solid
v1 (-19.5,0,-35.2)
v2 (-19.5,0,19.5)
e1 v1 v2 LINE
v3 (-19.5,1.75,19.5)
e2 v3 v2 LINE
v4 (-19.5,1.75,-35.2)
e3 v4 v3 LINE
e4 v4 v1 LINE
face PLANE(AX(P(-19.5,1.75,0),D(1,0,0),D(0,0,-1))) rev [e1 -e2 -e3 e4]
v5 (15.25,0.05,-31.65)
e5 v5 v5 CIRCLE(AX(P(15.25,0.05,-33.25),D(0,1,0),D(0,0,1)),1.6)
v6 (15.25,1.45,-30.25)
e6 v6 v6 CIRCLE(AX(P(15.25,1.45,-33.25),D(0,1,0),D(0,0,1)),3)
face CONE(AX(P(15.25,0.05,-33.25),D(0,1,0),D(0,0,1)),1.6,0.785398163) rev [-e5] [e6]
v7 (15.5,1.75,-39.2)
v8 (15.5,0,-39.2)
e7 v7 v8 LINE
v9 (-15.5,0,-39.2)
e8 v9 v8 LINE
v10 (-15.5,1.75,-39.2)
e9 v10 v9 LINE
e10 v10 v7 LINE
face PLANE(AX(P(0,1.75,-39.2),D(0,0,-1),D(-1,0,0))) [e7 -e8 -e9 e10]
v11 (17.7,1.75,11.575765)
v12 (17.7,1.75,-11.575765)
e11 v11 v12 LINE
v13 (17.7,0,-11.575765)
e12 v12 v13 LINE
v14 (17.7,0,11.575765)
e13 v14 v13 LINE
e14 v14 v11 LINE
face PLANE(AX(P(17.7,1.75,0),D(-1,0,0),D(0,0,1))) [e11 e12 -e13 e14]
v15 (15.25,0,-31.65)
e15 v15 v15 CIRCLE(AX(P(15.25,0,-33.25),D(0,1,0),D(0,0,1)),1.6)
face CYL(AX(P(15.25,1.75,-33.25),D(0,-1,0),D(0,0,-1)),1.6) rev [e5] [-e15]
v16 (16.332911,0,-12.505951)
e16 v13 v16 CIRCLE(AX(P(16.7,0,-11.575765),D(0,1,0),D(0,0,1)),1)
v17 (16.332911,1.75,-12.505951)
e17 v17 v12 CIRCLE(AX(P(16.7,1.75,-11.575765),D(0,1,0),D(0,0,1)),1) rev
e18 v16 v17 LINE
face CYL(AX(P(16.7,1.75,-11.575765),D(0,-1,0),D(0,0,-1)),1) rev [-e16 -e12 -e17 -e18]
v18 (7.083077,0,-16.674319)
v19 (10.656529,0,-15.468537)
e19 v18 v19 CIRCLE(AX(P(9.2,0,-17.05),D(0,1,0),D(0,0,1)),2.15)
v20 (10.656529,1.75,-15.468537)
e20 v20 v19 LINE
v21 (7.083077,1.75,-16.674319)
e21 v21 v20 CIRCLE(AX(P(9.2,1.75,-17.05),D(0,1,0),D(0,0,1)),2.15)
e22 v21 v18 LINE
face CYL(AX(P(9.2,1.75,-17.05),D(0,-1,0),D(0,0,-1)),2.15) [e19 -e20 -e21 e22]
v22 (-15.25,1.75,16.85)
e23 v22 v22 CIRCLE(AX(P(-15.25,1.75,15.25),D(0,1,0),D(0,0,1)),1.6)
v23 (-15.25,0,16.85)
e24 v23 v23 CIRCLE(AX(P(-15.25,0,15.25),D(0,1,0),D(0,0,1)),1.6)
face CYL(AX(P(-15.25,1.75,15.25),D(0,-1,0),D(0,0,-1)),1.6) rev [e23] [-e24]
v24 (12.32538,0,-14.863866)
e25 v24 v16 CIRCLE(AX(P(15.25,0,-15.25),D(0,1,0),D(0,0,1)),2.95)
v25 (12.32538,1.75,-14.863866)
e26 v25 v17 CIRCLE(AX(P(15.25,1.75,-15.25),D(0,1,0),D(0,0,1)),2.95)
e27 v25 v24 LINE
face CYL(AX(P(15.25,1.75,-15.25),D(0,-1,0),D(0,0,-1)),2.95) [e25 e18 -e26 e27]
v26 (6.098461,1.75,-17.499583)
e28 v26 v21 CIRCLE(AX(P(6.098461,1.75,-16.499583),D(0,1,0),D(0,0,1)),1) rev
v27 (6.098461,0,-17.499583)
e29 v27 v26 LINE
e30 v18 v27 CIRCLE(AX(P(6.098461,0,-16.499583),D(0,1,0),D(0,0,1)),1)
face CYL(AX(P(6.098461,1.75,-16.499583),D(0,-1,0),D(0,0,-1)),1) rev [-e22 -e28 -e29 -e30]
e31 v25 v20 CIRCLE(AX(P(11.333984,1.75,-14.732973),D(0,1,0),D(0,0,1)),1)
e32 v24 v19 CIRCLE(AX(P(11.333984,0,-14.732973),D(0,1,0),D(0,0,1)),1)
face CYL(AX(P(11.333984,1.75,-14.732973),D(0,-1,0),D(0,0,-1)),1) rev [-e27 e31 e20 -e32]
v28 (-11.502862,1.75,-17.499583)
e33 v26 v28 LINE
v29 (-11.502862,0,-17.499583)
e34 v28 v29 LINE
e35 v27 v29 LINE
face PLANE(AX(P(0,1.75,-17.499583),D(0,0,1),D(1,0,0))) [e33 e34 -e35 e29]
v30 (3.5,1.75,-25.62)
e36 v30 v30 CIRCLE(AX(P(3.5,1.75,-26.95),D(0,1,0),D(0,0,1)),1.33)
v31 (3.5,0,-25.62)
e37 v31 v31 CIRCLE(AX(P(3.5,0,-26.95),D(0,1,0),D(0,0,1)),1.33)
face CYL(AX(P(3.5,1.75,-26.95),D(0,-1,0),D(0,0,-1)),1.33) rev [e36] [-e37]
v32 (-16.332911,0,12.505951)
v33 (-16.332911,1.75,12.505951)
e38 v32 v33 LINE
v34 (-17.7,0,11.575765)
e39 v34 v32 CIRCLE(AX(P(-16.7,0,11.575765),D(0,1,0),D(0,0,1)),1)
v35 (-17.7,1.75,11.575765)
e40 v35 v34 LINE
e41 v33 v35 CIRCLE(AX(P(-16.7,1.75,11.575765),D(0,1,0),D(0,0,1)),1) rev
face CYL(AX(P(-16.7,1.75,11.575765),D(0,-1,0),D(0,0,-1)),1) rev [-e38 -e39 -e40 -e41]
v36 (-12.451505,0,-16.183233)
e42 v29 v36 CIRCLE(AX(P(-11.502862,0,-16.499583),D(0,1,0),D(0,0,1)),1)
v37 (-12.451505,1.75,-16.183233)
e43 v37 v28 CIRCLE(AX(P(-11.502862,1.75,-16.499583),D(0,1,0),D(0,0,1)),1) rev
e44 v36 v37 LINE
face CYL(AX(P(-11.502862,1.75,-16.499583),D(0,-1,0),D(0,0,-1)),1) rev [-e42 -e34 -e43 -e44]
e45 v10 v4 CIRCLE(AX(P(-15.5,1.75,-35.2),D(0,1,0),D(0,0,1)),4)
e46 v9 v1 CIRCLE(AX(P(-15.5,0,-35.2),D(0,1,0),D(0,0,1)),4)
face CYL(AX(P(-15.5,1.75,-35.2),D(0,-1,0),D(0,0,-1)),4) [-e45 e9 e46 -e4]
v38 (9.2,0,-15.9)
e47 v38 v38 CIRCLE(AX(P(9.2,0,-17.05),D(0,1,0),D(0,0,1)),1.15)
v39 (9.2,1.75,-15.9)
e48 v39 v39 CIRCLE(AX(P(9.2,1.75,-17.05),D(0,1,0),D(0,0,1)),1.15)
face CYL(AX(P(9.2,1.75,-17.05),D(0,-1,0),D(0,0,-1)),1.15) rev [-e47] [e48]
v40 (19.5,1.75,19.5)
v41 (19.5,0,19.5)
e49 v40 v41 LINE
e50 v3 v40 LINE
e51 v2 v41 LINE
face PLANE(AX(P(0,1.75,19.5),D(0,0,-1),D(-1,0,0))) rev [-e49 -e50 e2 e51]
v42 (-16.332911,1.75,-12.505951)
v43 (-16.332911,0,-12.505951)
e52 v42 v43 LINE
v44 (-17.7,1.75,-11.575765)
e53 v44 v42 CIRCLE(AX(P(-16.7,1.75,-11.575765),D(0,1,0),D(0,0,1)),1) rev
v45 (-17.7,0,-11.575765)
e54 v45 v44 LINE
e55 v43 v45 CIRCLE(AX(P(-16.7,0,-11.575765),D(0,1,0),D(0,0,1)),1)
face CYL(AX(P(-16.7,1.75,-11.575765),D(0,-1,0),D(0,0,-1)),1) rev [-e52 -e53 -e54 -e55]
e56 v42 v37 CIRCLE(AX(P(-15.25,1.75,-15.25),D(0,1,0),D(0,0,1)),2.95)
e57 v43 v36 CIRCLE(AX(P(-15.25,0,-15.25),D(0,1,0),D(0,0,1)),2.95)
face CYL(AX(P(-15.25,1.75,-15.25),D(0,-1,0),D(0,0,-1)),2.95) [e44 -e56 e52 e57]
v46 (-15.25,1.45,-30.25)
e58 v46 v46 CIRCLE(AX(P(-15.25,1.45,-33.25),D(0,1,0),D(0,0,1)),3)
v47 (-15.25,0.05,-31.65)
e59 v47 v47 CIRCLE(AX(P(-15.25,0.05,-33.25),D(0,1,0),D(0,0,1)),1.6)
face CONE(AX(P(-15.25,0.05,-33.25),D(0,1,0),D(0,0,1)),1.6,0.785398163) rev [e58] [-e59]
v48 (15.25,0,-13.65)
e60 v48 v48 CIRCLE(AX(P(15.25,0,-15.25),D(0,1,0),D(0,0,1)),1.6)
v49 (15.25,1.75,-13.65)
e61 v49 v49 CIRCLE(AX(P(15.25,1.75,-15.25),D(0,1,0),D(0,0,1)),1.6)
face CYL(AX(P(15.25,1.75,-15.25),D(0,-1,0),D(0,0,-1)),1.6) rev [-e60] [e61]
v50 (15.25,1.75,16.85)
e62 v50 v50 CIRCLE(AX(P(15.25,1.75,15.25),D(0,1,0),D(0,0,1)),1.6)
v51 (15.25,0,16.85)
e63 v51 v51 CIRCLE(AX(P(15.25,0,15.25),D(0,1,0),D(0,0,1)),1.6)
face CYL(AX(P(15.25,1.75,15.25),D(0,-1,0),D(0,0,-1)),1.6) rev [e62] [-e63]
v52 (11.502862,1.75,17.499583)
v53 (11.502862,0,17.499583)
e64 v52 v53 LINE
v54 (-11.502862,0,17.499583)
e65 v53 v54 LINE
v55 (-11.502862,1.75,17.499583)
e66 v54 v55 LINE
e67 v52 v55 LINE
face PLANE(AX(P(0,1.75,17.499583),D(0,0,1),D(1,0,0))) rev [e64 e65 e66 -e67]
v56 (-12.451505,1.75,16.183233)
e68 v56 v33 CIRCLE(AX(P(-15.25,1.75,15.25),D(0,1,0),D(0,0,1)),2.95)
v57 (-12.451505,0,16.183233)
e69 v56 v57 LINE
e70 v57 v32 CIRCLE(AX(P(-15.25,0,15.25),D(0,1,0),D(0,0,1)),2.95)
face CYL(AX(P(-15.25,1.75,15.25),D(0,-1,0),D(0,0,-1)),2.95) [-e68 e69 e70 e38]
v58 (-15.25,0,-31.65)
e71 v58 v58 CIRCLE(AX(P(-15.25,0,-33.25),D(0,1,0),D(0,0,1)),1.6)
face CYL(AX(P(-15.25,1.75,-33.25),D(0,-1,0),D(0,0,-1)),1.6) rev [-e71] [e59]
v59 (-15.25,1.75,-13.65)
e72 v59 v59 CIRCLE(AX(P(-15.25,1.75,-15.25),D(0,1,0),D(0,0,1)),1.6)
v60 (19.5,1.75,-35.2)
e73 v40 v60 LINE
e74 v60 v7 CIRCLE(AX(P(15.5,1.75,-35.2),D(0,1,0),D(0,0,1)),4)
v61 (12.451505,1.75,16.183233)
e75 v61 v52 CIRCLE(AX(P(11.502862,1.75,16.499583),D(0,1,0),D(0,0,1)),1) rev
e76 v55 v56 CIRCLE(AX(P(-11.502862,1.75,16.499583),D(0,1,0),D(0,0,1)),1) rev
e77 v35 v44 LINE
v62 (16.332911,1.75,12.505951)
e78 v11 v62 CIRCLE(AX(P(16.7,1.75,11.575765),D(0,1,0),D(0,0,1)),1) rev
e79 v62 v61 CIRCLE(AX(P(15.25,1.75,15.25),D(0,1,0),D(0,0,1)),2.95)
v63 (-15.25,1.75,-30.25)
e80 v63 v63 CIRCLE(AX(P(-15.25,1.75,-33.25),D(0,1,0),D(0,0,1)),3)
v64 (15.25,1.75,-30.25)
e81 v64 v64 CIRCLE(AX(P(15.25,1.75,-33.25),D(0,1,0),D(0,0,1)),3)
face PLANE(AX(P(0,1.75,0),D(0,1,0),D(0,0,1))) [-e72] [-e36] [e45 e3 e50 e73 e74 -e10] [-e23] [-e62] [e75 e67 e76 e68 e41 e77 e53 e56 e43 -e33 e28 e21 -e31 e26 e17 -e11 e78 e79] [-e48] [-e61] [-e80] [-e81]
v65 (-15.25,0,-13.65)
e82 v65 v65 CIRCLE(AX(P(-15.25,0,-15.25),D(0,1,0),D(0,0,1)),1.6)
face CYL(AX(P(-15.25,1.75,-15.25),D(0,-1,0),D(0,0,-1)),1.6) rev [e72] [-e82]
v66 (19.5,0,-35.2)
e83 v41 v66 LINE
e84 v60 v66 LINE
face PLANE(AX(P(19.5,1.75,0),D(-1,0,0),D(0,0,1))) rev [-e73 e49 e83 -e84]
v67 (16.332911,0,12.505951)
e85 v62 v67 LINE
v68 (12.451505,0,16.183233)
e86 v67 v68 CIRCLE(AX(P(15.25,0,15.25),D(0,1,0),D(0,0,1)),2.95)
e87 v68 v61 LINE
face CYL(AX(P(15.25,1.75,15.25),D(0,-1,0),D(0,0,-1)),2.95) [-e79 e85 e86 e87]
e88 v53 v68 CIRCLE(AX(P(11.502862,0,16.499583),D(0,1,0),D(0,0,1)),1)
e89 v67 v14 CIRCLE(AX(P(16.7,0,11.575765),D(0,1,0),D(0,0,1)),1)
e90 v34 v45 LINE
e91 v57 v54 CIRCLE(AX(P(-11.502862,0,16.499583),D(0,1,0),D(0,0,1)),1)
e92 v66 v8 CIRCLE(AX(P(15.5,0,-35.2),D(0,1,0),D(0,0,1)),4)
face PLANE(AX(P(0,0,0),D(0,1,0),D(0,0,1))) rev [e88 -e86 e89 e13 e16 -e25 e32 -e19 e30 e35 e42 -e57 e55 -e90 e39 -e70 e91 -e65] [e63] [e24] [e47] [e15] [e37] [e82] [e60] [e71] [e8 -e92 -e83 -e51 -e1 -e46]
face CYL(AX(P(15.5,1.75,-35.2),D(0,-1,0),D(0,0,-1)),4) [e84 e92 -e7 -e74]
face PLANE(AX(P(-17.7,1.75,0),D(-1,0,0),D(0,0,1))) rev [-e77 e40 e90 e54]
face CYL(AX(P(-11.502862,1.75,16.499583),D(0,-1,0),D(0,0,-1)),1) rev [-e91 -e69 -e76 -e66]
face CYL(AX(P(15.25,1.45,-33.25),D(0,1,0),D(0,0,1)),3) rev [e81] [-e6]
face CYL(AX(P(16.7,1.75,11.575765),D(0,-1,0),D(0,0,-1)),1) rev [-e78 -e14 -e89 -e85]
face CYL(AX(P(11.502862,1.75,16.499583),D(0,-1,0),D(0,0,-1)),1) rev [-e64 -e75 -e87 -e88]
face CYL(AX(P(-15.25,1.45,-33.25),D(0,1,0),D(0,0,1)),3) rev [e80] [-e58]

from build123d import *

# Parameters (mm, degrees)
SKETCH1_R               = 1.6
SKETCH1_R_2             = 1.15
SKETCH1_R_3             = 1.33
BASE_SHAPE_DEPTH        = 1.75
MILLING_FILLETS_R       = 1
SKETCH3_R               = 3
SCREW_HEAD_CUT_DEPTH    = 0.3
SCREW_HEAD_CHAMFER_SIZE = 1.4


with BuildPart() as part:
    # Sketch1 → Base shape (new body)
    with BuildSketch(Plane(origin=(0, 0, 0), x_dir=(1, 0, 0), z_dir=(0, 1, 0))):
        with BuildLine():
            Line((15.5, 39.2), (-15.5, 39.2))
            ThreePointArc((-15.5, 39.2), (-18.328427125, 38.028427125), (-19.5, 35.2))
            Line((-19.5, 35.2), (-19.5, -19.5))
            Line((-19.5, -19.5), (19.5, -19.5))
            Line((19.5, -19.5), (19.5, 35.2))
            ThreePointArc((19.5, 35.2), (18.328427125, 38.028427125), (15.5, 39.2))
        make_face()
        with Locations(Location((-15.25, -15.25, 0), (0, 0, 270))):
            Circle(SKETCH1_R, mode=Mode.SUBTRACT)
        with Locations(Location((15.25, -15.25, 0), (0, 0, 270))):
            Circle(SKETCH1_R, mode=Mode.SUBTRACT)
        with BuildLine():
            ThreePointArc((-17.7, 13.606832327), (-13.284874461, 13.049822367), (-13.341630288, 17.499583304))
            Line((-13.341630288, 17.499583304), (7.05, 17.499583304))
            Line((7.05, 17.499583304), (7.05, 17.05))
            ThreePointArc((7.05, 17.05), (8.336587223, 15.08098543), (10.656528722, 15.46853736))
            ThreePointArc((10.656528722, 15.46853736), (11.674639953, 15.673161101), (12.325380263, 14.863866097))
            ThreePointArc((12.325380263, 14.863866097), (14.578174541, 12.377518398), (17.7, 13.606832327))
            Line((17.7, 13.606832327), (17.7, -13.606832327))
            ThreePointArc((17.7, -13.606832327), (13.284874461, -13.049822367), (13.341630288, -17.499583304))
            Line((13.341630288, -17.499583304), (-13.341630288, -17.499583304))
            ThreePointArc((-13.341630288, -17.499583304), (-13.284874461, -13.049822367), (-17.7, -13.606832327))
            Line((-17.7, -13.606832327), (-17.7, 13.606832327))
        make_face(mode=Mode.SUBTRACT)
        with Locations(Location((-15.25, 15.25, 0), (0, 0, 270))):
            Circle(SKETCH1_R, mode=Mode.SUBTRACT)
        with Locations(Location((-15.25, 33.25, 0), (0, 0, 270))):
            Circle(SKETCH1_R, mode=Mode.SUBTRACT)
        with Locations(Location((9.2, 17.05, 0), (0, 0, 270))):
            Circle(SKETCH1_R_2, mode=Mode.SUBTRACT)
        with Locations(Location((15.25, 15.25, 0), (0, 0, 270))):
            Circle(SKETCH1_R, mode=Mode.SUBTRACT)
        with Locations(Location((3.5, 26.95, 0), (0, 0, 270))):
            Circle(SKETCH1_R_3, mode=Mode.SUBTRACT)
        with Locations(Location((15.25, 33.25, 0), (0, 0, 270))):
            Circle(SKETCH1_R, mode=Mode.SUBTRACT)
    extrude(amount=BASE_SHAPE_DEPTH)

    # Milling fillets
    milling_fillets_edges = [part.edges().sort_by_distance(p)[0] for p in [
        (-17.7, 0.875, 13.606832327),
        (-13.341630288, 0.875, 17.499583304),
        (13.341630288, 0.875, 17.499583304),
        (17.7, 0.875, 13.606832327),
        (17.7, 0.875, -13.606832327),
        (-13.341630288, 0.875, -17.499583304),
        (-17.7, 0.875, -13.606832327),
        (7.05, 0.875, -17.499583304),
    ]]
    fillet(milling_fillets_edges, radius=MILLING_FILLETS_R)

    # Sketch3 → Screw head cut (cut)
    with BuildSketch(Plane(origin=(0, 1.75, 0), x_dir=(1, 0, 0), z_dir=(0, 1, 0))):
        with Locations(Location((-15.25, 33.25, 0), (0, 0, 270))):
            Circle(SKETCH3_R)
        with Locations(Location((15.25, 33.25, 0), (0, 0, 270))):
            Circle(SKETCH3_R)
    extrude(amount=-SCREW_HEAD_CUT_DEPTH, mode=Mode.SUBTRACT)

    # Screw head chamfer
    screw_head_chamfer_edges = [part.edges().sort_by_distance(p)[0] for p in [
        (-15.25, 1.45, -34.85),
        (15.25, 1.45, -34.85),
    ]]
    chamfer(screw_head_chamfer_edges, length=SCREW_HEAD_CHAMFER_SIZE - 0.0001)  # a hair under: the kernel refuses the full size


solid = part.part
